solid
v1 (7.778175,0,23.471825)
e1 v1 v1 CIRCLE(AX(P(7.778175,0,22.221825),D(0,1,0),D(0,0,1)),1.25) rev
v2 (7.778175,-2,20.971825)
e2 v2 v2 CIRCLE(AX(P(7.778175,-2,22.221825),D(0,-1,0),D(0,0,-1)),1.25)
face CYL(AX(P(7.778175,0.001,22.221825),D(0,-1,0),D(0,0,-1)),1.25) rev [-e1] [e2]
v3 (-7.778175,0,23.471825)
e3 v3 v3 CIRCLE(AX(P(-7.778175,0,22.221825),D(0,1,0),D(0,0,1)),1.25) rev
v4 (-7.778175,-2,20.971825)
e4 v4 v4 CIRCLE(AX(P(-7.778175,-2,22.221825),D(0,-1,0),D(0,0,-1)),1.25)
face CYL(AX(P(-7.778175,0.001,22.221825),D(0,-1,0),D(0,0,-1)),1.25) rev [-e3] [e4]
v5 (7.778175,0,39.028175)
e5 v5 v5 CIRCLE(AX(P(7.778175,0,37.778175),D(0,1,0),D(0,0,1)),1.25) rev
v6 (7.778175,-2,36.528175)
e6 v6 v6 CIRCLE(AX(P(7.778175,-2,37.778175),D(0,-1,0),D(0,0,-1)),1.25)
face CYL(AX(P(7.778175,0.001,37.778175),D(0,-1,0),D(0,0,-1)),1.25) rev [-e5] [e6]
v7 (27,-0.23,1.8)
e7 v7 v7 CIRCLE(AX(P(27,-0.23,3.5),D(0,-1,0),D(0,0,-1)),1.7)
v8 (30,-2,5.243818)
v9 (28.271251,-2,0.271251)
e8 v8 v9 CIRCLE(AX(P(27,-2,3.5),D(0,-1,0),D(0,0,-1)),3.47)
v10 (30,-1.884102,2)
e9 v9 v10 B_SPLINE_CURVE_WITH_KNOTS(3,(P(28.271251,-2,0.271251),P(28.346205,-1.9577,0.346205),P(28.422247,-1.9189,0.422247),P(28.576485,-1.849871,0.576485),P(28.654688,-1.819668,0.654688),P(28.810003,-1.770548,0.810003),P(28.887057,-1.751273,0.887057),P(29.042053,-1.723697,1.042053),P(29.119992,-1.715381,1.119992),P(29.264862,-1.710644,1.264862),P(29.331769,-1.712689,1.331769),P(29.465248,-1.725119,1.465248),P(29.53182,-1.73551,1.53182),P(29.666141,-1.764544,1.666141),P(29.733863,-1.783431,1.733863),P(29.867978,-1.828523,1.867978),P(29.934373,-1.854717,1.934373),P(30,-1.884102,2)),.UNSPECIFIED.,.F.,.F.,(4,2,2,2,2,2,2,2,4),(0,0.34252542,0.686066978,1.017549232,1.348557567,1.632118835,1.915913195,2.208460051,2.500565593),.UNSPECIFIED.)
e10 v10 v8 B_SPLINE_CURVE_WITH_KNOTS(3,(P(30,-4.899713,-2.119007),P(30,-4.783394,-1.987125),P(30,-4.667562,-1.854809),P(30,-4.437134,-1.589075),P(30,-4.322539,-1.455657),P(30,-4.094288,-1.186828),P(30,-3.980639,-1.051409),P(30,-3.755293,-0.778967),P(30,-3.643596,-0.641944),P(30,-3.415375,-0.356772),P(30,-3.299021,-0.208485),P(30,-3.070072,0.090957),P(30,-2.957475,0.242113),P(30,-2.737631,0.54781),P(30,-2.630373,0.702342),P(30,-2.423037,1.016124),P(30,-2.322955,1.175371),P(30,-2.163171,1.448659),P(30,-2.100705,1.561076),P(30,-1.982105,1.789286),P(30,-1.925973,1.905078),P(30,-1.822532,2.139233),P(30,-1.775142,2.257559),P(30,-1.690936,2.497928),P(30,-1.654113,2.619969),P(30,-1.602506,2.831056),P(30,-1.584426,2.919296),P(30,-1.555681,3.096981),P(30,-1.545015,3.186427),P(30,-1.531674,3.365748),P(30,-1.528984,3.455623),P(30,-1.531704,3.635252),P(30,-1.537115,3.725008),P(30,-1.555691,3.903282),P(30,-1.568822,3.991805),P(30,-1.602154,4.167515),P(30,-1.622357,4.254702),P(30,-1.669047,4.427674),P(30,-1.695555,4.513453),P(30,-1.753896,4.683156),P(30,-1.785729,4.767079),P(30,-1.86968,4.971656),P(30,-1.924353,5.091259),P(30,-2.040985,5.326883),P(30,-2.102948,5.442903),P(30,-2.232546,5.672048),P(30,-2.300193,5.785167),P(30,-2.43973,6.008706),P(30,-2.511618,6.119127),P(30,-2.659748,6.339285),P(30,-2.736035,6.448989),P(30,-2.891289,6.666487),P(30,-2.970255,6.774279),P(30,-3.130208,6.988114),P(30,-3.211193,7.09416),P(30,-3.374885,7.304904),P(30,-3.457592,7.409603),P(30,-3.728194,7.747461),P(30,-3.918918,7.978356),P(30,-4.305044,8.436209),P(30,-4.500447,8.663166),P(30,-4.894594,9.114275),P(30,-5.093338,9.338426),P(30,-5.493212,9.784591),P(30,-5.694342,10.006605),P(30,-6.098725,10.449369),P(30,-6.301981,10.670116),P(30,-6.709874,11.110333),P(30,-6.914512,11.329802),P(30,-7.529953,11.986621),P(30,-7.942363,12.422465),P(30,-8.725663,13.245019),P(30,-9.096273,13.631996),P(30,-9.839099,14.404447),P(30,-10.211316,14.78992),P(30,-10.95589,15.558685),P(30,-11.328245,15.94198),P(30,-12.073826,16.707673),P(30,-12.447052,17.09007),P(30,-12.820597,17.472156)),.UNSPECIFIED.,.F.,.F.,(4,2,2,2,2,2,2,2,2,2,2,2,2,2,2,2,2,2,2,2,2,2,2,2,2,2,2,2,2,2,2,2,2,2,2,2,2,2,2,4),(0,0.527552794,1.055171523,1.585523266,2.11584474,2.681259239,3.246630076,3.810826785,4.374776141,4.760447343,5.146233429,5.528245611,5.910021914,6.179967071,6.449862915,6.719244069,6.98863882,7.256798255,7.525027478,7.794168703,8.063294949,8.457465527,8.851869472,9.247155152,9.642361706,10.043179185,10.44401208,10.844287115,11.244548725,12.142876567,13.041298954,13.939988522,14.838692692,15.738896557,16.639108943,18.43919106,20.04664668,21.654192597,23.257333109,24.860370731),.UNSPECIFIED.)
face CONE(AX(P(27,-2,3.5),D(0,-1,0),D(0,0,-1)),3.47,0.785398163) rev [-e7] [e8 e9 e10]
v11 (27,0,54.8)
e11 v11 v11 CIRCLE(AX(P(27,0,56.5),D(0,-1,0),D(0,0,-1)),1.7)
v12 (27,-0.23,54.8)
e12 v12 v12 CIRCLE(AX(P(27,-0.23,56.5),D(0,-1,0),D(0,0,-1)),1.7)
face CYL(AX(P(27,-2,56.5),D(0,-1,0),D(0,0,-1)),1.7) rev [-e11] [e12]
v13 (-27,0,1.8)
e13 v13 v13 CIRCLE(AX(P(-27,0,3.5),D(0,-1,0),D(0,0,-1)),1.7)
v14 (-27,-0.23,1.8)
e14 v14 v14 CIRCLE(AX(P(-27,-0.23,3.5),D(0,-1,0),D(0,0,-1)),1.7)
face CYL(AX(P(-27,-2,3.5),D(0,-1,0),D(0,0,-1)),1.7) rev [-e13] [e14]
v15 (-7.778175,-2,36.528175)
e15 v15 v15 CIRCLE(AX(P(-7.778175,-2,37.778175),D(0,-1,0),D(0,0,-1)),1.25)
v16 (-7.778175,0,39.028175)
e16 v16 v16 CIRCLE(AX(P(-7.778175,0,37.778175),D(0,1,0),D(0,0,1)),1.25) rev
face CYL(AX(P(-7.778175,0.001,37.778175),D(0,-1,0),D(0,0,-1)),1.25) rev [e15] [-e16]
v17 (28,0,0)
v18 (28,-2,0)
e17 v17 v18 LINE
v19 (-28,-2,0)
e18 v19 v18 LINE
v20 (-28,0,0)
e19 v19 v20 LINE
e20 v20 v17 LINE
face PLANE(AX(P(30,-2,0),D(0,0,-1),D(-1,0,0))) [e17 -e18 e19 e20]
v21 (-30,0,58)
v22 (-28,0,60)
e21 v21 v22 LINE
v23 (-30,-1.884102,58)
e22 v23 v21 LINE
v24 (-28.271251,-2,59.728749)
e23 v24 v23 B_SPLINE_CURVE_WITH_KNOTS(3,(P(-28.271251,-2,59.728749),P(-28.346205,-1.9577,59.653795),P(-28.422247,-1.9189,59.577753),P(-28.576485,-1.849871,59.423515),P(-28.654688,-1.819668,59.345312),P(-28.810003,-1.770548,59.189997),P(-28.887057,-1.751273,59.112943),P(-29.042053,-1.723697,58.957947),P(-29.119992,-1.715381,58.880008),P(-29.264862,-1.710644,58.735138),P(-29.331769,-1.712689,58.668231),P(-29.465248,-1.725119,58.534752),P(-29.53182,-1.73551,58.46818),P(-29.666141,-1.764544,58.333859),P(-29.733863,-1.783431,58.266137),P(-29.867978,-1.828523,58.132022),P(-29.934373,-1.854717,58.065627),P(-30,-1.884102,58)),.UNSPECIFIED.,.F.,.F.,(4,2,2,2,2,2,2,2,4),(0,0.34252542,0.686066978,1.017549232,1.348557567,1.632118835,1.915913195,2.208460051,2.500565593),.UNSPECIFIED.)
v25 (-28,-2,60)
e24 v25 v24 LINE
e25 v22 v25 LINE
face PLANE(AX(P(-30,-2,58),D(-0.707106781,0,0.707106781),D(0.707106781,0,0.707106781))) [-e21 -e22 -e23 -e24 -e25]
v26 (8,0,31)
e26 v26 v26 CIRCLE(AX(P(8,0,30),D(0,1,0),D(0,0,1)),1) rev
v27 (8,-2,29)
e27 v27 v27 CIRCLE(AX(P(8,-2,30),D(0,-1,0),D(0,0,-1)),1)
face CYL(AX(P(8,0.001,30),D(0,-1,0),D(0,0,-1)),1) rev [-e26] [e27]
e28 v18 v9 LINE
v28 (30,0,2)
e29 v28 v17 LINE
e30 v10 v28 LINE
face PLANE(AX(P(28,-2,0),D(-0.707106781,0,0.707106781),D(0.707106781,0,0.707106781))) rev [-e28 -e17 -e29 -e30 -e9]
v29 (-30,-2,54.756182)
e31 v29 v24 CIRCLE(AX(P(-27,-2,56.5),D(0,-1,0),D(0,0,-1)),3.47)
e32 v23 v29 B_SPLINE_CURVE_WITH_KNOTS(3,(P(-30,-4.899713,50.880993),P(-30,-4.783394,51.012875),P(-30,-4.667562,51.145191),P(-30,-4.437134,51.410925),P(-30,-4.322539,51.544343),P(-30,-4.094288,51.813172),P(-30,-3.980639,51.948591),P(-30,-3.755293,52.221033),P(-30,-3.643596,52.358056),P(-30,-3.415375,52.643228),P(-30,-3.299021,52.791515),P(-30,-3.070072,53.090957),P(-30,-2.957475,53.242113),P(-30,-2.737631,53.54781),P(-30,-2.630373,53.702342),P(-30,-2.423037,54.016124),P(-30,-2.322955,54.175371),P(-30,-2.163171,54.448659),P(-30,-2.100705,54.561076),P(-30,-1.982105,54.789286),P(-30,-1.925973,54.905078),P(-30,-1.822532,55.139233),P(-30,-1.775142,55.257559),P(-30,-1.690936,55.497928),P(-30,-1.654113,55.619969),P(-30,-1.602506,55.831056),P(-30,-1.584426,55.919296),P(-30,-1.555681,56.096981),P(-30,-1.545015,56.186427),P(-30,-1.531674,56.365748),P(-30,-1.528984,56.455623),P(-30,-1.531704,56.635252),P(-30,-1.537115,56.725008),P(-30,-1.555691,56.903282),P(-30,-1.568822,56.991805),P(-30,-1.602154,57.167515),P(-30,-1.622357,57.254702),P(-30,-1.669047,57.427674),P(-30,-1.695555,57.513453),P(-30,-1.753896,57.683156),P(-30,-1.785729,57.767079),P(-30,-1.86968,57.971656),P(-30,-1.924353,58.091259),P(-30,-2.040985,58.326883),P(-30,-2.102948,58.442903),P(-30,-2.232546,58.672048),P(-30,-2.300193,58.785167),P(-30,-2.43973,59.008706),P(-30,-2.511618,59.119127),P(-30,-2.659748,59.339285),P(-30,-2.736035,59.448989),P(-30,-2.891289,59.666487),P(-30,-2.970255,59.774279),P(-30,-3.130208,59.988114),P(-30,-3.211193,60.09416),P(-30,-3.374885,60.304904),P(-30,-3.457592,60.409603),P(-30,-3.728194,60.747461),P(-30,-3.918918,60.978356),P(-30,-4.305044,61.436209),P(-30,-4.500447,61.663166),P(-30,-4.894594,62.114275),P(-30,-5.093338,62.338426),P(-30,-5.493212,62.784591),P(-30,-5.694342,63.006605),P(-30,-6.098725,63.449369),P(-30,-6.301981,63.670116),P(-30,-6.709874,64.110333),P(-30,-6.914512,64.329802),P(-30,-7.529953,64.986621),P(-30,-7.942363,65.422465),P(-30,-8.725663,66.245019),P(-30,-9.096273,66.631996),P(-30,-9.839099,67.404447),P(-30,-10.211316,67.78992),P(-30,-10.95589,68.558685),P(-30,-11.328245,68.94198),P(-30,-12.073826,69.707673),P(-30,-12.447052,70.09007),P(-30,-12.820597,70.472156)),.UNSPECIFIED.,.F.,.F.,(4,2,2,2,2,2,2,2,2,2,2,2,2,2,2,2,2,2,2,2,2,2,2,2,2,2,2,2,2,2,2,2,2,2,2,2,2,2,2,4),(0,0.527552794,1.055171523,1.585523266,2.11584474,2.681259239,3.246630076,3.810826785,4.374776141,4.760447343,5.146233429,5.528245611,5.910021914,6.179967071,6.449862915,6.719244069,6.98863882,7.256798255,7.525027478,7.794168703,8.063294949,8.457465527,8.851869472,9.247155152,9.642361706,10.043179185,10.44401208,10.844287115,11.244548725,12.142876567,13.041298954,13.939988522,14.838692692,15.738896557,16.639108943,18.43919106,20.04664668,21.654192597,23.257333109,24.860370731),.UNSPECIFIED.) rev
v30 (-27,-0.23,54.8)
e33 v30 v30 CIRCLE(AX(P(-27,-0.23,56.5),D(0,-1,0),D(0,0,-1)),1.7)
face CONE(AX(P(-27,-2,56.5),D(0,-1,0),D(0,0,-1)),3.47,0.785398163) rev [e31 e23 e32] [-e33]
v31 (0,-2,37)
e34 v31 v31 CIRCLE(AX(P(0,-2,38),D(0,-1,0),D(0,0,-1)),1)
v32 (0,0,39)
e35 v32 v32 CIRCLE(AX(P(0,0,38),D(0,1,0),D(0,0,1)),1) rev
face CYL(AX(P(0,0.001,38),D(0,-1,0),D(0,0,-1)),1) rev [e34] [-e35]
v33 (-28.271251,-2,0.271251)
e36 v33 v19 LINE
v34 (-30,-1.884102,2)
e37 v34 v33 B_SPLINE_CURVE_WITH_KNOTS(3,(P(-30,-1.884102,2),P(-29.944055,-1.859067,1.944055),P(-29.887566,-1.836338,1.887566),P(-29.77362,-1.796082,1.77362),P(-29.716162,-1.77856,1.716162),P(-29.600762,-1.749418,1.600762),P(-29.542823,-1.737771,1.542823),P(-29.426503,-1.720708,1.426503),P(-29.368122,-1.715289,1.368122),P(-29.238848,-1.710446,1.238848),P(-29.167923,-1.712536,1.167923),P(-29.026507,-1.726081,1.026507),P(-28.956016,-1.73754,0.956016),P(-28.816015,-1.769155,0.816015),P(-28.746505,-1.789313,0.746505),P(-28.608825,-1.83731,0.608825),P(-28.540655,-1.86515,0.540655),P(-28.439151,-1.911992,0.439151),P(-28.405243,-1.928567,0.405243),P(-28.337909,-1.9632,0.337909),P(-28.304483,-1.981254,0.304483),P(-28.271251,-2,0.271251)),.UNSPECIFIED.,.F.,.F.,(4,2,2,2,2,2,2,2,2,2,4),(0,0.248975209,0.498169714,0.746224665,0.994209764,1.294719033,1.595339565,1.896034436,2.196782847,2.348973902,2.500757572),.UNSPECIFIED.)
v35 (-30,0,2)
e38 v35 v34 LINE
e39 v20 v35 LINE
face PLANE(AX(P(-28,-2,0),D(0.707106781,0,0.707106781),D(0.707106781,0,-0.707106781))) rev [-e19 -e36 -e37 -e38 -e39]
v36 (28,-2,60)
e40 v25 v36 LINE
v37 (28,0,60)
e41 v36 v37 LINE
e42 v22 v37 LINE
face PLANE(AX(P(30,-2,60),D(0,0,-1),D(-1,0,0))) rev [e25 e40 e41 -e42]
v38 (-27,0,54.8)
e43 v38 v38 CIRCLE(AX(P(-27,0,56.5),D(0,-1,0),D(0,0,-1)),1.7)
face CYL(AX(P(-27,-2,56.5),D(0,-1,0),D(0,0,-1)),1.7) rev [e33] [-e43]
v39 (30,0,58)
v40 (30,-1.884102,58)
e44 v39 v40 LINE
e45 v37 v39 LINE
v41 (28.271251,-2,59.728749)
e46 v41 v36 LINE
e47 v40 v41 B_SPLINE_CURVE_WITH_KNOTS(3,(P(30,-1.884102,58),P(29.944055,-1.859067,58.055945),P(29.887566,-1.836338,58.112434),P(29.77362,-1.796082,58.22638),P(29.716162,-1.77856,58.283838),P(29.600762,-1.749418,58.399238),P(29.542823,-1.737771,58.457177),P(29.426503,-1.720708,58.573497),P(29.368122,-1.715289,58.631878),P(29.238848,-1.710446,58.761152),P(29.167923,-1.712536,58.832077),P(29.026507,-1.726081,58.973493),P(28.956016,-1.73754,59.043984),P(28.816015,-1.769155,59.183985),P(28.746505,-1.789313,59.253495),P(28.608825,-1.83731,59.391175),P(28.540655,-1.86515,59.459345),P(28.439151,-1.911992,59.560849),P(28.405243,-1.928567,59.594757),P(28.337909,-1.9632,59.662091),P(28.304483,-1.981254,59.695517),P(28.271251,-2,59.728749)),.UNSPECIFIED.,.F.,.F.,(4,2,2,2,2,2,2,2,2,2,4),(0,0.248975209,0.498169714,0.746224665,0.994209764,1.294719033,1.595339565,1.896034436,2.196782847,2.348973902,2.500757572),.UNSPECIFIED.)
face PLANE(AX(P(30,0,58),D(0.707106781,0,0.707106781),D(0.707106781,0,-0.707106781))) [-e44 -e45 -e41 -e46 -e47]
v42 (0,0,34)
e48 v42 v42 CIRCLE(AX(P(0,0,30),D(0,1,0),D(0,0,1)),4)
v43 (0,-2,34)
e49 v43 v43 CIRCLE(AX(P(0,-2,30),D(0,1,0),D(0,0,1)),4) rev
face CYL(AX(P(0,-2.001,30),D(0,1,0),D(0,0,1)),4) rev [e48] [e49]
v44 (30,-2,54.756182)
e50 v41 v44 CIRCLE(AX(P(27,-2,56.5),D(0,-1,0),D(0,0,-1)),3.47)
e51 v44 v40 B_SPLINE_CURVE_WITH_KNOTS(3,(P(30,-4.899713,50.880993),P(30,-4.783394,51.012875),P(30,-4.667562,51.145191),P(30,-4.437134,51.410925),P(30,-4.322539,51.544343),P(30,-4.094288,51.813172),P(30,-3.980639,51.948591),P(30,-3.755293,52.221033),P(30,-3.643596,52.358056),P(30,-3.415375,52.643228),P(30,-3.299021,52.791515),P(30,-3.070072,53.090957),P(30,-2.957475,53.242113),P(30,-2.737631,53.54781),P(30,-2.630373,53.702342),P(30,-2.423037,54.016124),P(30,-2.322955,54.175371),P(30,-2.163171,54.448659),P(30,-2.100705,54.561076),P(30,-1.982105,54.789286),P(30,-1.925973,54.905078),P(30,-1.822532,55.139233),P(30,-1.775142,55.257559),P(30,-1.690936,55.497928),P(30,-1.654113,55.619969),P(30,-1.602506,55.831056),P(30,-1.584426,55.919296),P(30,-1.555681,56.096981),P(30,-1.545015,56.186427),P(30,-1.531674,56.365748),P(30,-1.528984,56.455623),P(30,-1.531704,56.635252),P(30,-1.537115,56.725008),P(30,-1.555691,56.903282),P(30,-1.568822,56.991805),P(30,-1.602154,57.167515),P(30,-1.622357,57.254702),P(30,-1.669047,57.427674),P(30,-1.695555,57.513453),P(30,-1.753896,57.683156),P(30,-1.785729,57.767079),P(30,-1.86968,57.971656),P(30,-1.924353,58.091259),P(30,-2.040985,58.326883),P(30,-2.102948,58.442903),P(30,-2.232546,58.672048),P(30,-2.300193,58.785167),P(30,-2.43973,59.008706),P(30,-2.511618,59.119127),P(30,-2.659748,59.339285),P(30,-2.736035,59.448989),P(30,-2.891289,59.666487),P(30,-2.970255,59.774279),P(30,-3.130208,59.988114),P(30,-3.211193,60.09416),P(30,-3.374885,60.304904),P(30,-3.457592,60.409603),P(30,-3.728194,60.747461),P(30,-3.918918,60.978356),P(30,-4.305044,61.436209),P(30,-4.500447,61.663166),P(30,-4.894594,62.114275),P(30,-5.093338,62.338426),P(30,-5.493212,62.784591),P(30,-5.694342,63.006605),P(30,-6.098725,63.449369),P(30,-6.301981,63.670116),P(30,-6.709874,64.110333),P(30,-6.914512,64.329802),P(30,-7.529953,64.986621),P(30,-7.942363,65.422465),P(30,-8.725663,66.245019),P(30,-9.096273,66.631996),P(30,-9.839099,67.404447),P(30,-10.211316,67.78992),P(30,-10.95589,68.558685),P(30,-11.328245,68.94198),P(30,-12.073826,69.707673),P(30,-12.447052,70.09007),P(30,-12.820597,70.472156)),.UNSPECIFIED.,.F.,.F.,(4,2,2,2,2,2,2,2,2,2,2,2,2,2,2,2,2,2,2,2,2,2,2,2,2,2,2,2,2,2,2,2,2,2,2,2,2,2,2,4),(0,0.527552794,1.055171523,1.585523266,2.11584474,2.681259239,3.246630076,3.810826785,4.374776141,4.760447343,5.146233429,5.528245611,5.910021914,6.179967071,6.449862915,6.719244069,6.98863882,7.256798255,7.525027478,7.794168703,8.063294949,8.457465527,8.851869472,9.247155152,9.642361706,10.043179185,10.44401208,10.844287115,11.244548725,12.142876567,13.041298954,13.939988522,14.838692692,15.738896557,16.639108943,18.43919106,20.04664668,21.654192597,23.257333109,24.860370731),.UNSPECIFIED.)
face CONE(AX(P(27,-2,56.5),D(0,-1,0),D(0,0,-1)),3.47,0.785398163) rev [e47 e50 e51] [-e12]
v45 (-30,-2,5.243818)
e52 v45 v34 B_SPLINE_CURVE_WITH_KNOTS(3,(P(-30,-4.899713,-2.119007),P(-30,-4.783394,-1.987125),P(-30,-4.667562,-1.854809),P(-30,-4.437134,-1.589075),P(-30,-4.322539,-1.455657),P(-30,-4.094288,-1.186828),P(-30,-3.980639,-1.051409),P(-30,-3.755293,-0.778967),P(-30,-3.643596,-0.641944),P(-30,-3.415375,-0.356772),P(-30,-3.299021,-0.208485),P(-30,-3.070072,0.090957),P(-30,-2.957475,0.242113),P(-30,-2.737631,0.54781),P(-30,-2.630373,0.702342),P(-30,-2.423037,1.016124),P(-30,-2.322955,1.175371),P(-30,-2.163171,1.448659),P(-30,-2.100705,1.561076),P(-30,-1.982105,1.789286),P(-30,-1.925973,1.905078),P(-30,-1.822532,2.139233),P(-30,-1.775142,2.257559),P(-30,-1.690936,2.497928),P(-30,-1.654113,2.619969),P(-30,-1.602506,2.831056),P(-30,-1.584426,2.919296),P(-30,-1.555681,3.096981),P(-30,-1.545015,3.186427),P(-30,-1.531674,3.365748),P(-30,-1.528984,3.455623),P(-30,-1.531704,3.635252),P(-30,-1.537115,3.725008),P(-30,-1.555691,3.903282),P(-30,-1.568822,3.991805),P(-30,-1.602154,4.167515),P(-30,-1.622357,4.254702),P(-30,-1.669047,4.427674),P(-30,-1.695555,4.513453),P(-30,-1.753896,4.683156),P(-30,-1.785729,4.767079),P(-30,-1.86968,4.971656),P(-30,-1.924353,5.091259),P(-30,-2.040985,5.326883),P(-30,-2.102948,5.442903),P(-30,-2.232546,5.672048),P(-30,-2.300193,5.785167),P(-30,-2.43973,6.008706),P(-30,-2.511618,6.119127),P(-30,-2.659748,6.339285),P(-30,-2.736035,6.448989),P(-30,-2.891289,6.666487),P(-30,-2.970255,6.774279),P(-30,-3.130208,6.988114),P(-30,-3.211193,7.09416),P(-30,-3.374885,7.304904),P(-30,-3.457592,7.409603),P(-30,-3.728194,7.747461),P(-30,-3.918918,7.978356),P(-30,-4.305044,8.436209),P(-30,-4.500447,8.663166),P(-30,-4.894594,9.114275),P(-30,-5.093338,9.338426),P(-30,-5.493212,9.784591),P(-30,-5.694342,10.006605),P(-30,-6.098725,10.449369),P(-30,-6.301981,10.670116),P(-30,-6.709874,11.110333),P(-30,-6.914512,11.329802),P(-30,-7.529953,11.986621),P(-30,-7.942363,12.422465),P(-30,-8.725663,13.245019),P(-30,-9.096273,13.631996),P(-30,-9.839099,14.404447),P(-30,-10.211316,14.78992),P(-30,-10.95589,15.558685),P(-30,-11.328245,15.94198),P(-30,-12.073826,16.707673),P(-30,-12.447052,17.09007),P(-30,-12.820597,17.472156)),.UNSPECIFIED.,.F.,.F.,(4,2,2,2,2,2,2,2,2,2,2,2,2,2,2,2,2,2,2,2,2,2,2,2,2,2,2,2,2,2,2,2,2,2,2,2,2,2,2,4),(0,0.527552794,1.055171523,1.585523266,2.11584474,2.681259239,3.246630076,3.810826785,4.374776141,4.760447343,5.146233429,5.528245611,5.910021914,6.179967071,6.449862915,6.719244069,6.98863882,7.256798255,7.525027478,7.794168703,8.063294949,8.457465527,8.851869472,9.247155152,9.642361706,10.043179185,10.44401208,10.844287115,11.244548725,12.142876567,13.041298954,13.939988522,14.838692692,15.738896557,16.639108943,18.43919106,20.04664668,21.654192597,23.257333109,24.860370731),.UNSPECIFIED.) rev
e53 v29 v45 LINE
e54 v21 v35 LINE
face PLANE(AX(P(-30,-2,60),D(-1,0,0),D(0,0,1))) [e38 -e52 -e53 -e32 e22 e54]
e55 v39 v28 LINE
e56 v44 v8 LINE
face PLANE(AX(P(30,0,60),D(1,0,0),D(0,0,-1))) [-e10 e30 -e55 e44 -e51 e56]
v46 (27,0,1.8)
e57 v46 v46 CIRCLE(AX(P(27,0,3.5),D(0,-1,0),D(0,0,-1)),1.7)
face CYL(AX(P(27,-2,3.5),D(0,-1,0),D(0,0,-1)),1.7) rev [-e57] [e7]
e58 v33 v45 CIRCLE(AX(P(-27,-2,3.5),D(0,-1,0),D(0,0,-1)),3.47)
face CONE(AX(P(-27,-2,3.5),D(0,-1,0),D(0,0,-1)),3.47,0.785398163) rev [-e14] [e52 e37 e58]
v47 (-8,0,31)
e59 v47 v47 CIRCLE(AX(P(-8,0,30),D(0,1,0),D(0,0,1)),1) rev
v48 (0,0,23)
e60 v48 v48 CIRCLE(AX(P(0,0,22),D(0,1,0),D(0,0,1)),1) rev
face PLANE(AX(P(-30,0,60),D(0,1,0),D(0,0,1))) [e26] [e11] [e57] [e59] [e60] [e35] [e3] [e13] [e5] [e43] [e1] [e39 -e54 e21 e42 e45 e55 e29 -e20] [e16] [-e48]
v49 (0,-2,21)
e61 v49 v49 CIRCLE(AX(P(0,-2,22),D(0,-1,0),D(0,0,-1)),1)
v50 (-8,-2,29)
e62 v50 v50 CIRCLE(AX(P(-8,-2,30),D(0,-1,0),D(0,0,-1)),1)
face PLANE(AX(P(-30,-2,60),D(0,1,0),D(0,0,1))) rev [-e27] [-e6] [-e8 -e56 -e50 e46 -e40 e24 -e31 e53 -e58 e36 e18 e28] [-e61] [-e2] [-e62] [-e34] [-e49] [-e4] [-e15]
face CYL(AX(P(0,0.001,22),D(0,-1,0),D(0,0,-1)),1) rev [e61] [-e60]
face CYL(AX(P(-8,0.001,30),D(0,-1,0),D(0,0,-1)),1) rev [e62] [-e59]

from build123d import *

# Parameters (mm, degrees)
SKETCH1_W                                    = 60
SKETCH1_H                                    = 2
BASE_FLANGE1_DEPTH                           = 60
SKETCH2_R                                    = 1.25
CUT_EXTRUDE1_DEPTH                           = 10
CSK_FOR_M3_HEX_SOCKET_COUNTERSUNK_HE_2_COUNT = 2
CSK_FOR_M3_HEX_SOCKET_COUNTERSUNK_HE_2_PITCH = 54
CSK_FOR_M3_HEX_SOCKET_COUNTERSUNK_HE_3_COUNT = 2
CSK_FOR_M3_HEX_SOCKET_COUNTERSUNK_HE_3_PITCH = 53
CSK_FOR_M3_HEX_SOCKET_COUNTERSUNK_HE_4_COUNT = 2
CSK_FOR_M3_HEX_SOCKET_COUNTERSUNK_HE_4_PITCH = 75.663729752
CUT_EXTRUDE2_REACH                           = 69.112
SKETCH4_R                                    = 4
CHAMFER1_SIZE                                = 2
CUT_EXTRUDE3_REACH                           = 69.112
SKETCH5_R                                    = 1.25
SKETCH5_R_2                                  = 1


# Sheet-metal steps are written as plain solids
with BuildPart() as part:
    # Sketch1 → Base-Flange1 (new body)
    with BuildSketch(Plane.XY):
        with Locations((0, -1)):
            Rectangle(SKETCH1_W, SKETCH1_H)
    extrude(amount=BASE_FLANGE1_DEPTH)

    # Sketch2 → Cut-Extrude1 (cut)
    with BuildSketch(Plane(origin=(0, 0, 0), x_dir=(1, 0, 0), z_dir=(0, 1, 0))):
        with Locations(Location((-27, -3.5, 0), (0, 0, 270))):
            Circle(SKETCH2_R)
        with Locations(Location((-27, -56.5, 0), (0, 0, 270))):
            Circle(SKETCH2_R)
        with Locations(Location((27, -56.5, 0), (0, 0, 270))):
            Circle(SKETCH2_R)
        with Locations(Location((27, -3.5, 0), (0, 0, 270))):
            Circle(SKETCH2_R)
    extrude(amount=-CUT_EXTRUDE1_DEPTH, mode=Mode.SUBTRACT)

    # Sketch3 → CSK for M3 Hex Socket Countersunk Head Screw1 (revolve, cut)
    with BuildSketch(Plane(origin=(27, -2, 3.5), x_dir=(0, 0, -1), z_dir=(1, 0, 0))):
        Polygon((0, 0), (0, 2), (1.7, 2), (1.7, 1.77), (3.47, 0), align=None)
    csk_for_m3_hex_socket_countersunk_head_s = revolve(axis=Axis((27, -8.35, 3.5), (0, 1, 0)), mode=Mode.SUBTRACT)

    # CSK for M3 Hex Socket Countersunk He 2: CSK for M3 Hex Socket Countersunk Head Screw1 ×2
    with Locations(*[(-i * CSK_FOR_M3_HEX_SOCKET_COUNTERSUNK_HE_2_PITCH, 0, 0) for i in range(1, CSK_FOR_M3_HEX_SOCKET_COUNTERSUNK_HE_2_COUNT)]):
        add(csk_for_m3_hex_socket_countersunk_head_s, mode=Mode.SUBTRACT)

    # CSK for M3 Hex Socket Countersunk He 3: CSK for M3 Hex Socket Countersunk Head Screw1 ×2
    with Locations(*[(0, 0, i * CSK_FOR_M3_HEX_SOCKET_COUNTERSUNK_HE_3_PITCH) for i in range(1, CSK_FOR_M3_HEX_SOCKET_COUNTERSUNK_HE_3_COUNT)]):
        add(csk_for_m3_hex_socket_countersunk_head_s, mode=Mode.SUBTRACT)

    # CSK for M3 Hex Socket Countersunk He 4: CSK for M3 Hex Socket Countersunk Head Screw1 ×2
    with Locations(*[Vector(-0.7136840884914971, 0, 0.7004677164823951) * (i * CSK_FOR_M3_HEX_SOCKET_COUNTERSUNK_HE_4_PITCH) for i in range(1, CSK_FOR_M3_HEX_SOCKET_COUNTERSUNK_HE_4_COUNT)]):
        add(csk_for_m3_hex_socket_countersunk_head_s, mode=Mode.SUBTRACT)

    # Sketch4 → Cut-Extrude2 (cut, up to next)
    with BuildSketch(Plane(origin=(0, 0, 0), x_dir=(1, 0, 0), z_dir=(0, 1, 0)), mode=Mode.PRIVATE) as cut_extrude2_sk1:
        with Locations(Location((0, -30, 0), (0, 0, 270))):
            Circle(SKETCH4_R)
    cut_extrude2_tool1 = extrude(cut_extrude2_sk1.sketch, amount=-CUT_EXTRUDE2_REACH, mode=Mode.PRIVATE) & part.part
    add(cut_extrude2_tool1.solids().sort_by_distance((0, 0, 30))[0], mode=Mode.SUBTRACT)

    # Chamfer1
    # the kernel refuses this chamfer: 2 mm, written as the material it takes off along each edge
    with BuildSketch(Plane(origin=(30, 5.143365976, 0), x_dir=(-0.9996219169112968, 0, -0.02749587661058639), z_dir=(0, -1, 0)), Plane(origin=(-30, -7.143365976, 60), x_dir=(-0.027495876610585647, 0, -0.9996219169112968), z_dir=(0, 1, 0))) as chamfer1_piece_1:
        Polygon((CHAMFER1_SIZE * 0.999621916911, -CHAMFER1_SIZE * 0.0274958766106), (-CHAMFER1_SIZE * 0.0274958766106, -CHAMFER1_SIZE * 0.999621916911), (0, 0), align=None)
    extrude(amount=12.286731952, mode=Mode.SUBTRACT)
    with BuildSketch(Plane(origin=(30, 5.143365976, 60), x_dir=(-0.9996219169112968, 0, 0.027495876610585647), z_dir=(0, -1, 0)), Plane(origin=(-30, -7.143365976, 0), x_dir=(-0.02749587661058563, 0, 0.9996219169112968), z_dir=(0, 1, 0))) as chamfer1_piece_2:
        Polygon((CHAMFER1_SIZE * 0.999621916911, CHAMFER1_SIZE * 0.0274958766106), (-CHAMFER1_SIZE * 0.0274958766106, CHAMFER1_SIZE * 0.999621916911), (0, 0), align=None)
    extrude(amount=12.286731952, mode=Mode.SUBTRACT)

    # Sketch5 → Cut-Extrude3 (cut, up to next)
    with BuildSketch(Plane.XZ.offset(2), mode=Mode.PRIVATE) as cut_extrude3_sk1:
        with Locations(Location((7.778174593, 37.778174593, 0), (0, 0, 270))):
            Circle(SKETCH5_R)
    cut_extrude3_tool1 = extrude(cut_extrude3_sk1.sketch, amount=-CUT_EXTRUDE3_REACH, mode=Mode.PRIVATE) & part.part
    # Sketch5 → Cut-Extrude3 (cut, up to next)
    with BuildSketch(Plane.XZ.offset(2), mode=Mode.PRIVATE) as cut_extrude3_sk2:
        with Locations(Location((-7.778174593, 37.778174593, 0), (0, 0, 270))):
            Circle(SKETCH5_R)
    cut_extrude3_tool2 = extrude(cut_extrude3_sk2.sketch, amount=-CUT_EXTRUDE3_REACH, mode=Mode.PRIVATE) & part.part
    # Sketch5 → Cut-Extrude3 (cut, up to next)
    with BuildSketch(Plane.XZ.offset(2), mode=Mode.PRIVATE) as cut_extrude3_sk3:
        with Locations(Location((-7.778174593, 22.221825407, 0), (0, 0, 270))):
            Circle(SKETCH5_R)
    cut_extrude3_tool3 = extrude(cut_extrude3_sk3.sketch, amount=-CUT_EXTRUDE3_REACH, mode=Mode.PRIVATE) & part.part
    # Sketch5 → Cut-Extrude3 (cut, up to next)
    with BuildSketch(Plane.XZ.offset(2), mode=Mode.PRIVATE) as cut_extrude3_sk4:
        with Locations(Location((7.778174593, 22.221825407, 0), (0, 0, 270))):
            Circle(SKETCH5_R)
    cut_extrude3_tool4 = extrude(cut_extrude3_sk4.sketch, amount=-CUT_EXTRUDE3_REACH, mode=Mode.PRIVATE) & part.part
    # Sketch5 → Cut-Extrude3 (cut, up to next)
    with BuildSketch(Plane.XZ.offset(2), mode=Mode.PRIVATE) as cut_extrude3_sk5:
        with Locations(Location((8, 30, 0), (0, 0, 270))):
            Circle(SKETCH5_R_2)
    cut_extrude3_tool5 = extrude(cut_extrude3_sk5.sketch, amount=-CUT_EXTRUDE3_REACH, mode=Mode.PRIVATE) & part.part
    # Sketch5 → Cut-Extrude3 (cut, up to next)
    with BuildSketch(Plane.XZ.offset(2), mode=Mode.PRIVATE) as cut_extrude3_sk6:
        with Locations(Location((0, 22, 0), (0, 0, 270))):
            Circle(SKETCH5_R_2)
    cut_extrude3_tool6 = extrude(cut_extrude3_sk6.sketch, amount=-CUT_EXTRUDE3_REACH, mode=Mode.PRIVATE) & part.part
    # Sketch5 → Cut-Extrude3 (cut, up to next)
    with BuildSketch(Plane.XZ.offset(2), mode=Mode.PRIVATE) as cut_extrude3_sk7:
        with Locations(Location((-8, 30, 0), (0, 0, 270))):
            Circle(SKETCH5_R_2)
    cut_extrude3_tool7 = extrude(cut_extrude3_sk7.sketch, amount=-CUT_EXTRUDE3_REACH, mode=Mode.PRIVATE) & part.part
    # Sketch5 → Cut-Extrude3 (cut, up to next)
    with BuildSketch(Plane.XZ.offset(2), mode=Mode.PRIVATE) as cut_extrude3_sk8:
        with Locations(Location((0, 38, 0), (0, 0, 270))):
            Circle(SKETCH5_R_2)
    cut_extrude3_tool8 = extrude(cut_extrude3_sk8.sketch, amount=-CUT_EXTRUDE3_REACH, mode=Mode.PRIVATE) & part.part
    add(cut_extrude3_tool1.solids().sort_by_distance((7.778175, -2, 37.778175))[0], mode=Mode.SUBTRACT)
    add(cut_extrude3_tool2.solids().sort_by_distance((-7.778175, -2, 37.778175))[0], mode=Mode.SUBTRACT)
    add(cut_extrude3_tool3.solids().sort_by_distance((-7.778175, -2, 22.221825))[0], mode=Mode.SUBTRACT)
    add(cut_extrude3_tool4.solids().sort_by_distance((7.778175, -2, 22.221825))[0], mode=Mode.SUBTRACT)
    add(cut_extrude3_tool5.solids().sort_by_distance((8, -2, 30))[0], mode=Mode.SUBTRACT)
    add(cut_extrude3_tool6.solids().sort_by_distance((0, -2, 22))[0], mode=Mode.SUBTRACT)
    add(cut_extrude3_tool7.solids().sort_by_distance((-8, -2, 30))[0], mode=Mode.SUBTRACT)
    add(cut_extrude3_tool8.solids().sort_by_distance((0, -2, 38))[0], mode=Mode.SUBTRACT)


solid = part.part
